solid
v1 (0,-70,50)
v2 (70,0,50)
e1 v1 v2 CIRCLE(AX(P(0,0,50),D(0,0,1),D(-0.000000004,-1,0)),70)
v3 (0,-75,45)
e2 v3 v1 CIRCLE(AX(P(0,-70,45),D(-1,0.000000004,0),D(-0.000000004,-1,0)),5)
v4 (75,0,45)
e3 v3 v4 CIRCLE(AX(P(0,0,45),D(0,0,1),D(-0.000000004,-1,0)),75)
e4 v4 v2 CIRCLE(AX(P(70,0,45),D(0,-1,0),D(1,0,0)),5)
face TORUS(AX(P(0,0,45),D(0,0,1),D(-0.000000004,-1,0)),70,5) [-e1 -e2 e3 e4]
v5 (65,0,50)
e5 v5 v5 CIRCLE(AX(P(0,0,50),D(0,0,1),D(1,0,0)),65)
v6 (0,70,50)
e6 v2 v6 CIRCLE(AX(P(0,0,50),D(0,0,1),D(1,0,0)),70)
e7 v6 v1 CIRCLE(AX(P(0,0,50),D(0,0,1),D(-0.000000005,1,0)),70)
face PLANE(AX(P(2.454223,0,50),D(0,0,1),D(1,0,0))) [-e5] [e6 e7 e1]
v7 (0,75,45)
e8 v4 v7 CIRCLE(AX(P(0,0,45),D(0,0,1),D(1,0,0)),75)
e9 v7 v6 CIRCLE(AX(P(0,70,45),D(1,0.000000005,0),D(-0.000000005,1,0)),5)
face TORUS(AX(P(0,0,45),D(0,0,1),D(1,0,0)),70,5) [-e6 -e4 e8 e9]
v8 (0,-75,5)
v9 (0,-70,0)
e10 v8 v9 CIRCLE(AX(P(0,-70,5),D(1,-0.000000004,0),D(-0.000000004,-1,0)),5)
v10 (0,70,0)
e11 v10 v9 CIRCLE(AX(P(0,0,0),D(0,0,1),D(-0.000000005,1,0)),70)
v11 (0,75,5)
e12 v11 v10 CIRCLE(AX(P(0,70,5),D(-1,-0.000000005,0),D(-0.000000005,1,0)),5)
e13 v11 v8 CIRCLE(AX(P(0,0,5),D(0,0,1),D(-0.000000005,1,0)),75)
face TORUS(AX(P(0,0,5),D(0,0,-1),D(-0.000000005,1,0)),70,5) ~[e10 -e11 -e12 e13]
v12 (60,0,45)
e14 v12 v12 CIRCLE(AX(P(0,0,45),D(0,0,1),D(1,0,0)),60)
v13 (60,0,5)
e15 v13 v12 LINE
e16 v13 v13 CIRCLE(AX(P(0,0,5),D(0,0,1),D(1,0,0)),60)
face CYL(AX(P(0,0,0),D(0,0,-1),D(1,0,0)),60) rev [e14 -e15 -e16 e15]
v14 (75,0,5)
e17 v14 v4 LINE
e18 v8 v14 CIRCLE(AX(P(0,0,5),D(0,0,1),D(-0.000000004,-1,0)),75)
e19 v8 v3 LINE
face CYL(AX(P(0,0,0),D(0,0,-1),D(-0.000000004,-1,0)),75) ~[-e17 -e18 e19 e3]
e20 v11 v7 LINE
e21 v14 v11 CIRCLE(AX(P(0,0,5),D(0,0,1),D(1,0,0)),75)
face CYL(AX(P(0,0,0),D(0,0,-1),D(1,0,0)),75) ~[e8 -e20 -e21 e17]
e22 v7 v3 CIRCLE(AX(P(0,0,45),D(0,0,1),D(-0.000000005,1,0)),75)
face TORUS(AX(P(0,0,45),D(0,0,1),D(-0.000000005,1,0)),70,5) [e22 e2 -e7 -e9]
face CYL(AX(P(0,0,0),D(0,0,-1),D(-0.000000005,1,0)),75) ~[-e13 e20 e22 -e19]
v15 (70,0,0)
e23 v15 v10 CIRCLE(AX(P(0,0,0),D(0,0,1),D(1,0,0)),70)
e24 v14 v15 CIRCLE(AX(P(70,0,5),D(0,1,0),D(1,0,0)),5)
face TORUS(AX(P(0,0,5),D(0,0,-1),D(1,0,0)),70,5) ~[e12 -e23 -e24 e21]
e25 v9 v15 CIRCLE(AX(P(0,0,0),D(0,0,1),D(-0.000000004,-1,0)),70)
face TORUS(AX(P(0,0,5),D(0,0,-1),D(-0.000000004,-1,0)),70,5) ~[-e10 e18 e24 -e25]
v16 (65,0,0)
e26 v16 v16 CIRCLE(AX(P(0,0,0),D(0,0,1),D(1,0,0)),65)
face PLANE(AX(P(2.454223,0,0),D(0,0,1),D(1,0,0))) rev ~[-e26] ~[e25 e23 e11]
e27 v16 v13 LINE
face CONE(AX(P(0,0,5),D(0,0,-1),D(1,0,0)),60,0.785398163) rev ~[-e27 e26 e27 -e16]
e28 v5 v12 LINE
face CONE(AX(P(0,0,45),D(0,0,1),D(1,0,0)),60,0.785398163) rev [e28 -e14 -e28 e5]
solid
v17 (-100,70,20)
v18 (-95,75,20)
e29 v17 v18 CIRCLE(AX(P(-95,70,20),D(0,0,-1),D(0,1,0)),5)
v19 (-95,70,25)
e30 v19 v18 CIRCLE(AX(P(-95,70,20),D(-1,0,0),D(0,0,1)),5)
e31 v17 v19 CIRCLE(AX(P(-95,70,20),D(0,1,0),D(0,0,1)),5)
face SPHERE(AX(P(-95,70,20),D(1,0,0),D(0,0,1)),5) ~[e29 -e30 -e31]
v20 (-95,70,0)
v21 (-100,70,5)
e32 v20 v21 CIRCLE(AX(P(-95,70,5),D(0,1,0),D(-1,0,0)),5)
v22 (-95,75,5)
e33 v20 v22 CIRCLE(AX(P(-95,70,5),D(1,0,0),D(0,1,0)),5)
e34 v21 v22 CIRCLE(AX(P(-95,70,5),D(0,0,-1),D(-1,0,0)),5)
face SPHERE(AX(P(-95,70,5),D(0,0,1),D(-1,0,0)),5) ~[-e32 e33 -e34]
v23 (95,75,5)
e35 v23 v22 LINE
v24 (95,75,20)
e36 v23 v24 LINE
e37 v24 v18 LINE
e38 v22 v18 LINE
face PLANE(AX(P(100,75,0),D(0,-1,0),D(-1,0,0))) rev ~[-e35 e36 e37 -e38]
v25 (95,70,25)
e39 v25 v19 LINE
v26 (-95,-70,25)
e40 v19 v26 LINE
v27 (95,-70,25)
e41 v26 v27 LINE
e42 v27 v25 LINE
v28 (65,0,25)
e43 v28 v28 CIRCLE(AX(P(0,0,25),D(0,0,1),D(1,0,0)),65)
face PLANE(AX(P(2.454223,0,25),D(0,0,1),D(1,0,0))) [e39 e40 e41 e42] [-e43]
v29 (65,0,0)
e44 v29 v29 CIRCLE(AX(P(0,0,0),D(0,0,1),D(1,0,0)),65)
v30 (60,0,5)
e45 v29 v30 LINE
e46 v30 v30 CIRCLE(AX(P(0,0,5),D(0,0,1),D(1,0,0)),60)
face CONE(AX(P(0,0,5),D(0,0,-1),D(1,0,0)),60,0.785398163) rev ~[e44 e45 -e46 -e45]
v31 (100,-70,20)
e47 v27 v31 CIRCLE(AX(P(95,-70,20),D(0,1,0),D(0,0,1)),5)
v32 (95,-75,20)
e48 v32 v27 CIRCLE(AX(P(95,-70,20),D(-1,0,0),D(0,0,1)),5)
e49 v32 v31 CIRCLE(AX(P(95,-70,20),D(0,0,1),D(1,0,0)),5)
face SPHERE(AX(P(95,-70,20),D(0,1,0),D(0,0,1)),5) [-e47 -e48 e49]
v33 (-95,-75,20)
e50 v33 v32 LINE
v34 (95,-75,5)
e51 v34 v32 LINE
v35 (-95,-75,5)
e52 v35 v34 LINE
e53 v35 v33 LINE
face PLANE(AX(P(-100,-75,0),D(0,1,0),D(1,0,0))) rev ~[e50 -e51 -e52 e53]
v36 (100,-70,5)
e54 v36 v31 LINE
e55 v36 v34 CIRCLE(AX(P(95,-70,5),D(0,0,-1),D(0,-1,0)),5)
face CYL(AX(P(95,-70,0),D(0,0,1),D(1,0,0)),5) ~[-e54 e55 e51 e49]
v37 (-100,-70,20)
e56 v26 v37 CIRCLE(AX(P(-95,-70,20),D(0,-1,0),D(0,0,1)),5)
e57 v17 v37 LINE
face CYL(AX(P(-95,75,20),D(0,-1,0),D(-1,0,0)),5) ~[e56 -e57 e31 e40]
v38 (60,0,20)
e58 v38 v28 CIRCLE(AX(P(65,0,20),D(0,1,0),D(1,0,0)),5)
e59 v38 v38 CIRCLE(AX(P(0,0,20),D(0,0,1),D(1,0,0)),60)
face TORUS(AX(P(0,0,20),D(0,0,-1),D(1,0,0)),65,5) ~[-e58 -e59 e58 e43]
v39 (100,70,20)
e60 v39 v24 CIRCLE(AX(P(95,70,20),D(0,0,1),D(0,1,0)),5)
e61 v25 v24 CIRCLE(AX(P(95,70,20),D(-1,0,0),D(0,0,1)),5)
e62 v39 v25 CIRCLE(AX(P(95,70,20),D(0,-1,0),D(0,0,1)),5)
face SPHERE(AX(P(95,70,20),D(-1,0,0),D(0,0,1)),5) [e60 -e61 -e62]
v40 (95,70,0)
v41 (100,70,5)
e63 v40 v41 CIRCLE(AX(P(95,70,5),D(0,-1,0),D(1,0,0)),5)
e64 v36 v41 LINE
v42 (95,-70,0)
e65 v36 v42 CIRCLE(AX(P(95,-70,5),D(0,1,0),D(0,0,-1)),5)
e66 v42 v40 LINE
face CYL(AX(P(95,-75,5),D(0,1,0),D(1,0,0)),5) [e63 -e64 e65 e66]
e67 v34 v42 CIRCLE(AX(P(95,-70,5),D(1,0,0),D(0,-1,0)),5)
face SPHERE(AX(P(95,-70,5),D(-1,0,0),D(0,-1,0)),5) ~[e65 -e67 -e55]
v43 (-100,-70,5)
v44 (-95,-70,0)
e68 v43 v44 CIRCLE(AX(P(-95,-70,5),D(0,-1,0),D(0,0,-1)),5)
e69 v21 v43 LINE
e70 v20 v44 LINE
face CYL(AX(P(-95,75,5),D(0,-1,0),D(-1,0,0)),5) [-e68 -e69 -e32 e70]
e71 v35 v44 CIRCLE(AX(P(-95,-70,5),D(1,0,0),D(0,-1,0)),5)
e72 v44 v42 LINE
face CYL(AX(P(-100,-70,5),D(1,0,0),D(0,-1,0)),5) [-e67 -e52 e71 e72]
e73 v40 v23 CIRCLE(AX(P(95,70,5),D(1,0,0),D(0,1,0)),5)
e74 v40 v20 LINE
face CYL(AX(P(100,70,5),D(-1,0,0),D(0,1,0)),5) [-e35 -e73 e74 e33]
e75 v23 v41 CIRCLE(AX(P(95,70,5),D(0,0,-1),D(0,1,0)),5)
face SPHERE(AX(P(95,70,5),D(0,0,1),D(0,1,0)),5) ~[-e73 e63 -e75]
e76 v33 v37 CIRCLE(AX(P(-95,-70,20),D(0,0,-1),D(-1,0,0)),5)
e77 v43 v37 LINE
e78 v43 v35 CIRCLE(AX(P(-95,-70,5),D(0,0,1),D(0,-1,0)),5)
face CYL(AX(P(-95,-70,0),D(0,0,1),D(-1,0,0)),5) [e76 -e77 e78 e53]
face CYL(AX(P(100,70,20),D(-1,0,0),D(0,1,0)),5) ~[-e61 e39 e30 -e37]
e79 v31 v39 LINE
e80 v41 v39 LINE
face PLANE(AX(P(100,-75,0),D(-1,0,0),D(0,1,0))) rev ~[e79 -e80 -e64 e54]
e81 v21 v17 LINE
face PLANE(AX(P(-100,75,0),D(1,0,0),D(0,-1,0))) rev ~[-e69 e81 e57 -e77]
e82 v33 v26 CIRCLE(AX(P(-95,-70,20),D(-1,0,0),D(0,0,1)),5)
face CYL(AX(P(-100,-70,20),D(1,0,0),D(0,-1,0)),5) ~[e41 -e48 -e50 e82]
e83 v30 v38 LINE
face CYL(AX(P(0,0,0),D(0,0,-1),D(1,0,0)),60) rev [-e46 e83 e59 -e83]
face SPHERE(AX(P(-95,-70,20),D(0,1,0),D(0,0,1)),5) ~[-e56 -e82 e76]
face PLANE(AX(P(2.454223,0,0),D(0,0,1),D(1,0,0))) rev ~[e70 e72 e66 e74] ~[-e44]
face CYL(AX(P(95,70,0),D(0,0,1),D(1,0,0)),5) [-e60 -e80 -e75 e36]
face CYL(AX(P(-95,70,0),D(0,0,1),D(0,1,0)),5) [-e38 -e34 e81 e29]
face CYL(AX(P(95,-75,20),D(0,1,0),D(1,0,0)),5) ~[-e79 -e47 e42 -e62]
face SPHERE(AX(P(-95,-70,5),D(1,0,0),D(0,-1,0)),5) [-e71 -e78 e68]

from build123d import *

# Parameters (mm, degrees)
F0_R      = 60
F1_DEPTH  = 50
F2_DEPTH  = 25
F3_R      = 5
F3_2_R    = 5
F4_SIZE   = 5
F4_2_SIZE = 5


with BuildPart() as f1:
    # F0 (on Top) → F1 (new body)
    with BuildSketch(Plane.XY):
        with BuildLine():
            ThreePointArc((-3.096e-07, -75), (53.0330084795, -53.0330086984), (75, 0))
            ThreePointArc((75, 0), (53.0330084621, 53.0330087158), (-3.588e-07, 75))
            ThreePointArc((-3.588e-07, 75), (-75, -2.46e-08), (-3.096e-07, -75))
        make_face()
        Circle(F0_R, mode=Mode.SUBTRACT)
    extrude(amount=F1_DEPTH)

    # F3
    f3_edges = [f1.edges().sort_by_distance(p)[0] for p in [
        (0, -75, 0),
        (0, 75, 25),
        (0, -75, 50),
    ]]
    fillet(f3_edges, radius=F3_R)

    # F4#2
    f4_2_edges = [f1.edges().sort_by_distance(p)[0] for p in [
        (-60, 0, 0),
        (60, 0, 25),
        (-60, 0, 50),
    ]]
    chamfer(f4_2_edges, length=F4_2_SIZE)


with BuildPart() as f2:
    # F0 (on Top) → F2 (new body)
    with BuildSketch(Plane.XY):
        with BuildLine():
            ThreePointArc((-3.096e-07, -75), (53.0330084795, -53.0330086984), (75, 0))
            ThreePointArc((75, 0), (53.0330084621, 53.0330087158), (-3.588e-07, 75))
            ThreePointArc((-3.588e-07, 75), (-75, -2.46e-08), (-3.096e-07, -75))
        make_face()
        Circle(F0_R, mode=Mode.SUBTRACT)
        with BuildLine():
            ThreePointArc((-3.588e-07, 75), (53.0330084621, 53.0330087158), (75, 0))
            ThreePointArc((75, 0), (53.0330084795, -53.0330086984), (-3.096e-07, -75))
            Line((-3.096e-07, -75), (100, -75))
            Line((100, -75), (100, 75))
            Line((100, 75), (-3.588e-07, 75))
        make_face()
        with BuildLine():
            ThreePointArc((-3.096e-07, -75), (-75, -2.46e-08), (-3.588e-07, 75))
            Line((-3.588e-07, 75), (-100, 75))
            Line((-100, 75), (-100, -75))
            Line((-100, -75), (-3.096e-07, -75))
        make_face()
    extrude(amount=F2_DEPTH)

    # F3#2
    f3_2_edges = [f2.edges().sort_by_distance(p)[0] for p in [
        (0, -75, 0),
        (0, 75, 25),
        (100, 0, 25),
        (-100, 0, 25),
        (0, -75, 25),
        (-60, 0, 25),
        (-100, 75, 12.5),
        (-100, -75, 12.5),
        (-100, 0, 0),
        (100, 75, 12.5),
        (0, 75, 0),
        (100, -75, 12.5),
        (100, 0, 0),
    ]]
    fillet(f3_2_edges, radius=F3_2_R)

    # F4
    f4_edges = [f2.edges().sort_by_distance(p)[0] for p in [
        (-60, 0, 0),
    ]]
    chamfer(f4_edges, length=F4_SIZE)


solid = Compound([f1.part, f2.part])
